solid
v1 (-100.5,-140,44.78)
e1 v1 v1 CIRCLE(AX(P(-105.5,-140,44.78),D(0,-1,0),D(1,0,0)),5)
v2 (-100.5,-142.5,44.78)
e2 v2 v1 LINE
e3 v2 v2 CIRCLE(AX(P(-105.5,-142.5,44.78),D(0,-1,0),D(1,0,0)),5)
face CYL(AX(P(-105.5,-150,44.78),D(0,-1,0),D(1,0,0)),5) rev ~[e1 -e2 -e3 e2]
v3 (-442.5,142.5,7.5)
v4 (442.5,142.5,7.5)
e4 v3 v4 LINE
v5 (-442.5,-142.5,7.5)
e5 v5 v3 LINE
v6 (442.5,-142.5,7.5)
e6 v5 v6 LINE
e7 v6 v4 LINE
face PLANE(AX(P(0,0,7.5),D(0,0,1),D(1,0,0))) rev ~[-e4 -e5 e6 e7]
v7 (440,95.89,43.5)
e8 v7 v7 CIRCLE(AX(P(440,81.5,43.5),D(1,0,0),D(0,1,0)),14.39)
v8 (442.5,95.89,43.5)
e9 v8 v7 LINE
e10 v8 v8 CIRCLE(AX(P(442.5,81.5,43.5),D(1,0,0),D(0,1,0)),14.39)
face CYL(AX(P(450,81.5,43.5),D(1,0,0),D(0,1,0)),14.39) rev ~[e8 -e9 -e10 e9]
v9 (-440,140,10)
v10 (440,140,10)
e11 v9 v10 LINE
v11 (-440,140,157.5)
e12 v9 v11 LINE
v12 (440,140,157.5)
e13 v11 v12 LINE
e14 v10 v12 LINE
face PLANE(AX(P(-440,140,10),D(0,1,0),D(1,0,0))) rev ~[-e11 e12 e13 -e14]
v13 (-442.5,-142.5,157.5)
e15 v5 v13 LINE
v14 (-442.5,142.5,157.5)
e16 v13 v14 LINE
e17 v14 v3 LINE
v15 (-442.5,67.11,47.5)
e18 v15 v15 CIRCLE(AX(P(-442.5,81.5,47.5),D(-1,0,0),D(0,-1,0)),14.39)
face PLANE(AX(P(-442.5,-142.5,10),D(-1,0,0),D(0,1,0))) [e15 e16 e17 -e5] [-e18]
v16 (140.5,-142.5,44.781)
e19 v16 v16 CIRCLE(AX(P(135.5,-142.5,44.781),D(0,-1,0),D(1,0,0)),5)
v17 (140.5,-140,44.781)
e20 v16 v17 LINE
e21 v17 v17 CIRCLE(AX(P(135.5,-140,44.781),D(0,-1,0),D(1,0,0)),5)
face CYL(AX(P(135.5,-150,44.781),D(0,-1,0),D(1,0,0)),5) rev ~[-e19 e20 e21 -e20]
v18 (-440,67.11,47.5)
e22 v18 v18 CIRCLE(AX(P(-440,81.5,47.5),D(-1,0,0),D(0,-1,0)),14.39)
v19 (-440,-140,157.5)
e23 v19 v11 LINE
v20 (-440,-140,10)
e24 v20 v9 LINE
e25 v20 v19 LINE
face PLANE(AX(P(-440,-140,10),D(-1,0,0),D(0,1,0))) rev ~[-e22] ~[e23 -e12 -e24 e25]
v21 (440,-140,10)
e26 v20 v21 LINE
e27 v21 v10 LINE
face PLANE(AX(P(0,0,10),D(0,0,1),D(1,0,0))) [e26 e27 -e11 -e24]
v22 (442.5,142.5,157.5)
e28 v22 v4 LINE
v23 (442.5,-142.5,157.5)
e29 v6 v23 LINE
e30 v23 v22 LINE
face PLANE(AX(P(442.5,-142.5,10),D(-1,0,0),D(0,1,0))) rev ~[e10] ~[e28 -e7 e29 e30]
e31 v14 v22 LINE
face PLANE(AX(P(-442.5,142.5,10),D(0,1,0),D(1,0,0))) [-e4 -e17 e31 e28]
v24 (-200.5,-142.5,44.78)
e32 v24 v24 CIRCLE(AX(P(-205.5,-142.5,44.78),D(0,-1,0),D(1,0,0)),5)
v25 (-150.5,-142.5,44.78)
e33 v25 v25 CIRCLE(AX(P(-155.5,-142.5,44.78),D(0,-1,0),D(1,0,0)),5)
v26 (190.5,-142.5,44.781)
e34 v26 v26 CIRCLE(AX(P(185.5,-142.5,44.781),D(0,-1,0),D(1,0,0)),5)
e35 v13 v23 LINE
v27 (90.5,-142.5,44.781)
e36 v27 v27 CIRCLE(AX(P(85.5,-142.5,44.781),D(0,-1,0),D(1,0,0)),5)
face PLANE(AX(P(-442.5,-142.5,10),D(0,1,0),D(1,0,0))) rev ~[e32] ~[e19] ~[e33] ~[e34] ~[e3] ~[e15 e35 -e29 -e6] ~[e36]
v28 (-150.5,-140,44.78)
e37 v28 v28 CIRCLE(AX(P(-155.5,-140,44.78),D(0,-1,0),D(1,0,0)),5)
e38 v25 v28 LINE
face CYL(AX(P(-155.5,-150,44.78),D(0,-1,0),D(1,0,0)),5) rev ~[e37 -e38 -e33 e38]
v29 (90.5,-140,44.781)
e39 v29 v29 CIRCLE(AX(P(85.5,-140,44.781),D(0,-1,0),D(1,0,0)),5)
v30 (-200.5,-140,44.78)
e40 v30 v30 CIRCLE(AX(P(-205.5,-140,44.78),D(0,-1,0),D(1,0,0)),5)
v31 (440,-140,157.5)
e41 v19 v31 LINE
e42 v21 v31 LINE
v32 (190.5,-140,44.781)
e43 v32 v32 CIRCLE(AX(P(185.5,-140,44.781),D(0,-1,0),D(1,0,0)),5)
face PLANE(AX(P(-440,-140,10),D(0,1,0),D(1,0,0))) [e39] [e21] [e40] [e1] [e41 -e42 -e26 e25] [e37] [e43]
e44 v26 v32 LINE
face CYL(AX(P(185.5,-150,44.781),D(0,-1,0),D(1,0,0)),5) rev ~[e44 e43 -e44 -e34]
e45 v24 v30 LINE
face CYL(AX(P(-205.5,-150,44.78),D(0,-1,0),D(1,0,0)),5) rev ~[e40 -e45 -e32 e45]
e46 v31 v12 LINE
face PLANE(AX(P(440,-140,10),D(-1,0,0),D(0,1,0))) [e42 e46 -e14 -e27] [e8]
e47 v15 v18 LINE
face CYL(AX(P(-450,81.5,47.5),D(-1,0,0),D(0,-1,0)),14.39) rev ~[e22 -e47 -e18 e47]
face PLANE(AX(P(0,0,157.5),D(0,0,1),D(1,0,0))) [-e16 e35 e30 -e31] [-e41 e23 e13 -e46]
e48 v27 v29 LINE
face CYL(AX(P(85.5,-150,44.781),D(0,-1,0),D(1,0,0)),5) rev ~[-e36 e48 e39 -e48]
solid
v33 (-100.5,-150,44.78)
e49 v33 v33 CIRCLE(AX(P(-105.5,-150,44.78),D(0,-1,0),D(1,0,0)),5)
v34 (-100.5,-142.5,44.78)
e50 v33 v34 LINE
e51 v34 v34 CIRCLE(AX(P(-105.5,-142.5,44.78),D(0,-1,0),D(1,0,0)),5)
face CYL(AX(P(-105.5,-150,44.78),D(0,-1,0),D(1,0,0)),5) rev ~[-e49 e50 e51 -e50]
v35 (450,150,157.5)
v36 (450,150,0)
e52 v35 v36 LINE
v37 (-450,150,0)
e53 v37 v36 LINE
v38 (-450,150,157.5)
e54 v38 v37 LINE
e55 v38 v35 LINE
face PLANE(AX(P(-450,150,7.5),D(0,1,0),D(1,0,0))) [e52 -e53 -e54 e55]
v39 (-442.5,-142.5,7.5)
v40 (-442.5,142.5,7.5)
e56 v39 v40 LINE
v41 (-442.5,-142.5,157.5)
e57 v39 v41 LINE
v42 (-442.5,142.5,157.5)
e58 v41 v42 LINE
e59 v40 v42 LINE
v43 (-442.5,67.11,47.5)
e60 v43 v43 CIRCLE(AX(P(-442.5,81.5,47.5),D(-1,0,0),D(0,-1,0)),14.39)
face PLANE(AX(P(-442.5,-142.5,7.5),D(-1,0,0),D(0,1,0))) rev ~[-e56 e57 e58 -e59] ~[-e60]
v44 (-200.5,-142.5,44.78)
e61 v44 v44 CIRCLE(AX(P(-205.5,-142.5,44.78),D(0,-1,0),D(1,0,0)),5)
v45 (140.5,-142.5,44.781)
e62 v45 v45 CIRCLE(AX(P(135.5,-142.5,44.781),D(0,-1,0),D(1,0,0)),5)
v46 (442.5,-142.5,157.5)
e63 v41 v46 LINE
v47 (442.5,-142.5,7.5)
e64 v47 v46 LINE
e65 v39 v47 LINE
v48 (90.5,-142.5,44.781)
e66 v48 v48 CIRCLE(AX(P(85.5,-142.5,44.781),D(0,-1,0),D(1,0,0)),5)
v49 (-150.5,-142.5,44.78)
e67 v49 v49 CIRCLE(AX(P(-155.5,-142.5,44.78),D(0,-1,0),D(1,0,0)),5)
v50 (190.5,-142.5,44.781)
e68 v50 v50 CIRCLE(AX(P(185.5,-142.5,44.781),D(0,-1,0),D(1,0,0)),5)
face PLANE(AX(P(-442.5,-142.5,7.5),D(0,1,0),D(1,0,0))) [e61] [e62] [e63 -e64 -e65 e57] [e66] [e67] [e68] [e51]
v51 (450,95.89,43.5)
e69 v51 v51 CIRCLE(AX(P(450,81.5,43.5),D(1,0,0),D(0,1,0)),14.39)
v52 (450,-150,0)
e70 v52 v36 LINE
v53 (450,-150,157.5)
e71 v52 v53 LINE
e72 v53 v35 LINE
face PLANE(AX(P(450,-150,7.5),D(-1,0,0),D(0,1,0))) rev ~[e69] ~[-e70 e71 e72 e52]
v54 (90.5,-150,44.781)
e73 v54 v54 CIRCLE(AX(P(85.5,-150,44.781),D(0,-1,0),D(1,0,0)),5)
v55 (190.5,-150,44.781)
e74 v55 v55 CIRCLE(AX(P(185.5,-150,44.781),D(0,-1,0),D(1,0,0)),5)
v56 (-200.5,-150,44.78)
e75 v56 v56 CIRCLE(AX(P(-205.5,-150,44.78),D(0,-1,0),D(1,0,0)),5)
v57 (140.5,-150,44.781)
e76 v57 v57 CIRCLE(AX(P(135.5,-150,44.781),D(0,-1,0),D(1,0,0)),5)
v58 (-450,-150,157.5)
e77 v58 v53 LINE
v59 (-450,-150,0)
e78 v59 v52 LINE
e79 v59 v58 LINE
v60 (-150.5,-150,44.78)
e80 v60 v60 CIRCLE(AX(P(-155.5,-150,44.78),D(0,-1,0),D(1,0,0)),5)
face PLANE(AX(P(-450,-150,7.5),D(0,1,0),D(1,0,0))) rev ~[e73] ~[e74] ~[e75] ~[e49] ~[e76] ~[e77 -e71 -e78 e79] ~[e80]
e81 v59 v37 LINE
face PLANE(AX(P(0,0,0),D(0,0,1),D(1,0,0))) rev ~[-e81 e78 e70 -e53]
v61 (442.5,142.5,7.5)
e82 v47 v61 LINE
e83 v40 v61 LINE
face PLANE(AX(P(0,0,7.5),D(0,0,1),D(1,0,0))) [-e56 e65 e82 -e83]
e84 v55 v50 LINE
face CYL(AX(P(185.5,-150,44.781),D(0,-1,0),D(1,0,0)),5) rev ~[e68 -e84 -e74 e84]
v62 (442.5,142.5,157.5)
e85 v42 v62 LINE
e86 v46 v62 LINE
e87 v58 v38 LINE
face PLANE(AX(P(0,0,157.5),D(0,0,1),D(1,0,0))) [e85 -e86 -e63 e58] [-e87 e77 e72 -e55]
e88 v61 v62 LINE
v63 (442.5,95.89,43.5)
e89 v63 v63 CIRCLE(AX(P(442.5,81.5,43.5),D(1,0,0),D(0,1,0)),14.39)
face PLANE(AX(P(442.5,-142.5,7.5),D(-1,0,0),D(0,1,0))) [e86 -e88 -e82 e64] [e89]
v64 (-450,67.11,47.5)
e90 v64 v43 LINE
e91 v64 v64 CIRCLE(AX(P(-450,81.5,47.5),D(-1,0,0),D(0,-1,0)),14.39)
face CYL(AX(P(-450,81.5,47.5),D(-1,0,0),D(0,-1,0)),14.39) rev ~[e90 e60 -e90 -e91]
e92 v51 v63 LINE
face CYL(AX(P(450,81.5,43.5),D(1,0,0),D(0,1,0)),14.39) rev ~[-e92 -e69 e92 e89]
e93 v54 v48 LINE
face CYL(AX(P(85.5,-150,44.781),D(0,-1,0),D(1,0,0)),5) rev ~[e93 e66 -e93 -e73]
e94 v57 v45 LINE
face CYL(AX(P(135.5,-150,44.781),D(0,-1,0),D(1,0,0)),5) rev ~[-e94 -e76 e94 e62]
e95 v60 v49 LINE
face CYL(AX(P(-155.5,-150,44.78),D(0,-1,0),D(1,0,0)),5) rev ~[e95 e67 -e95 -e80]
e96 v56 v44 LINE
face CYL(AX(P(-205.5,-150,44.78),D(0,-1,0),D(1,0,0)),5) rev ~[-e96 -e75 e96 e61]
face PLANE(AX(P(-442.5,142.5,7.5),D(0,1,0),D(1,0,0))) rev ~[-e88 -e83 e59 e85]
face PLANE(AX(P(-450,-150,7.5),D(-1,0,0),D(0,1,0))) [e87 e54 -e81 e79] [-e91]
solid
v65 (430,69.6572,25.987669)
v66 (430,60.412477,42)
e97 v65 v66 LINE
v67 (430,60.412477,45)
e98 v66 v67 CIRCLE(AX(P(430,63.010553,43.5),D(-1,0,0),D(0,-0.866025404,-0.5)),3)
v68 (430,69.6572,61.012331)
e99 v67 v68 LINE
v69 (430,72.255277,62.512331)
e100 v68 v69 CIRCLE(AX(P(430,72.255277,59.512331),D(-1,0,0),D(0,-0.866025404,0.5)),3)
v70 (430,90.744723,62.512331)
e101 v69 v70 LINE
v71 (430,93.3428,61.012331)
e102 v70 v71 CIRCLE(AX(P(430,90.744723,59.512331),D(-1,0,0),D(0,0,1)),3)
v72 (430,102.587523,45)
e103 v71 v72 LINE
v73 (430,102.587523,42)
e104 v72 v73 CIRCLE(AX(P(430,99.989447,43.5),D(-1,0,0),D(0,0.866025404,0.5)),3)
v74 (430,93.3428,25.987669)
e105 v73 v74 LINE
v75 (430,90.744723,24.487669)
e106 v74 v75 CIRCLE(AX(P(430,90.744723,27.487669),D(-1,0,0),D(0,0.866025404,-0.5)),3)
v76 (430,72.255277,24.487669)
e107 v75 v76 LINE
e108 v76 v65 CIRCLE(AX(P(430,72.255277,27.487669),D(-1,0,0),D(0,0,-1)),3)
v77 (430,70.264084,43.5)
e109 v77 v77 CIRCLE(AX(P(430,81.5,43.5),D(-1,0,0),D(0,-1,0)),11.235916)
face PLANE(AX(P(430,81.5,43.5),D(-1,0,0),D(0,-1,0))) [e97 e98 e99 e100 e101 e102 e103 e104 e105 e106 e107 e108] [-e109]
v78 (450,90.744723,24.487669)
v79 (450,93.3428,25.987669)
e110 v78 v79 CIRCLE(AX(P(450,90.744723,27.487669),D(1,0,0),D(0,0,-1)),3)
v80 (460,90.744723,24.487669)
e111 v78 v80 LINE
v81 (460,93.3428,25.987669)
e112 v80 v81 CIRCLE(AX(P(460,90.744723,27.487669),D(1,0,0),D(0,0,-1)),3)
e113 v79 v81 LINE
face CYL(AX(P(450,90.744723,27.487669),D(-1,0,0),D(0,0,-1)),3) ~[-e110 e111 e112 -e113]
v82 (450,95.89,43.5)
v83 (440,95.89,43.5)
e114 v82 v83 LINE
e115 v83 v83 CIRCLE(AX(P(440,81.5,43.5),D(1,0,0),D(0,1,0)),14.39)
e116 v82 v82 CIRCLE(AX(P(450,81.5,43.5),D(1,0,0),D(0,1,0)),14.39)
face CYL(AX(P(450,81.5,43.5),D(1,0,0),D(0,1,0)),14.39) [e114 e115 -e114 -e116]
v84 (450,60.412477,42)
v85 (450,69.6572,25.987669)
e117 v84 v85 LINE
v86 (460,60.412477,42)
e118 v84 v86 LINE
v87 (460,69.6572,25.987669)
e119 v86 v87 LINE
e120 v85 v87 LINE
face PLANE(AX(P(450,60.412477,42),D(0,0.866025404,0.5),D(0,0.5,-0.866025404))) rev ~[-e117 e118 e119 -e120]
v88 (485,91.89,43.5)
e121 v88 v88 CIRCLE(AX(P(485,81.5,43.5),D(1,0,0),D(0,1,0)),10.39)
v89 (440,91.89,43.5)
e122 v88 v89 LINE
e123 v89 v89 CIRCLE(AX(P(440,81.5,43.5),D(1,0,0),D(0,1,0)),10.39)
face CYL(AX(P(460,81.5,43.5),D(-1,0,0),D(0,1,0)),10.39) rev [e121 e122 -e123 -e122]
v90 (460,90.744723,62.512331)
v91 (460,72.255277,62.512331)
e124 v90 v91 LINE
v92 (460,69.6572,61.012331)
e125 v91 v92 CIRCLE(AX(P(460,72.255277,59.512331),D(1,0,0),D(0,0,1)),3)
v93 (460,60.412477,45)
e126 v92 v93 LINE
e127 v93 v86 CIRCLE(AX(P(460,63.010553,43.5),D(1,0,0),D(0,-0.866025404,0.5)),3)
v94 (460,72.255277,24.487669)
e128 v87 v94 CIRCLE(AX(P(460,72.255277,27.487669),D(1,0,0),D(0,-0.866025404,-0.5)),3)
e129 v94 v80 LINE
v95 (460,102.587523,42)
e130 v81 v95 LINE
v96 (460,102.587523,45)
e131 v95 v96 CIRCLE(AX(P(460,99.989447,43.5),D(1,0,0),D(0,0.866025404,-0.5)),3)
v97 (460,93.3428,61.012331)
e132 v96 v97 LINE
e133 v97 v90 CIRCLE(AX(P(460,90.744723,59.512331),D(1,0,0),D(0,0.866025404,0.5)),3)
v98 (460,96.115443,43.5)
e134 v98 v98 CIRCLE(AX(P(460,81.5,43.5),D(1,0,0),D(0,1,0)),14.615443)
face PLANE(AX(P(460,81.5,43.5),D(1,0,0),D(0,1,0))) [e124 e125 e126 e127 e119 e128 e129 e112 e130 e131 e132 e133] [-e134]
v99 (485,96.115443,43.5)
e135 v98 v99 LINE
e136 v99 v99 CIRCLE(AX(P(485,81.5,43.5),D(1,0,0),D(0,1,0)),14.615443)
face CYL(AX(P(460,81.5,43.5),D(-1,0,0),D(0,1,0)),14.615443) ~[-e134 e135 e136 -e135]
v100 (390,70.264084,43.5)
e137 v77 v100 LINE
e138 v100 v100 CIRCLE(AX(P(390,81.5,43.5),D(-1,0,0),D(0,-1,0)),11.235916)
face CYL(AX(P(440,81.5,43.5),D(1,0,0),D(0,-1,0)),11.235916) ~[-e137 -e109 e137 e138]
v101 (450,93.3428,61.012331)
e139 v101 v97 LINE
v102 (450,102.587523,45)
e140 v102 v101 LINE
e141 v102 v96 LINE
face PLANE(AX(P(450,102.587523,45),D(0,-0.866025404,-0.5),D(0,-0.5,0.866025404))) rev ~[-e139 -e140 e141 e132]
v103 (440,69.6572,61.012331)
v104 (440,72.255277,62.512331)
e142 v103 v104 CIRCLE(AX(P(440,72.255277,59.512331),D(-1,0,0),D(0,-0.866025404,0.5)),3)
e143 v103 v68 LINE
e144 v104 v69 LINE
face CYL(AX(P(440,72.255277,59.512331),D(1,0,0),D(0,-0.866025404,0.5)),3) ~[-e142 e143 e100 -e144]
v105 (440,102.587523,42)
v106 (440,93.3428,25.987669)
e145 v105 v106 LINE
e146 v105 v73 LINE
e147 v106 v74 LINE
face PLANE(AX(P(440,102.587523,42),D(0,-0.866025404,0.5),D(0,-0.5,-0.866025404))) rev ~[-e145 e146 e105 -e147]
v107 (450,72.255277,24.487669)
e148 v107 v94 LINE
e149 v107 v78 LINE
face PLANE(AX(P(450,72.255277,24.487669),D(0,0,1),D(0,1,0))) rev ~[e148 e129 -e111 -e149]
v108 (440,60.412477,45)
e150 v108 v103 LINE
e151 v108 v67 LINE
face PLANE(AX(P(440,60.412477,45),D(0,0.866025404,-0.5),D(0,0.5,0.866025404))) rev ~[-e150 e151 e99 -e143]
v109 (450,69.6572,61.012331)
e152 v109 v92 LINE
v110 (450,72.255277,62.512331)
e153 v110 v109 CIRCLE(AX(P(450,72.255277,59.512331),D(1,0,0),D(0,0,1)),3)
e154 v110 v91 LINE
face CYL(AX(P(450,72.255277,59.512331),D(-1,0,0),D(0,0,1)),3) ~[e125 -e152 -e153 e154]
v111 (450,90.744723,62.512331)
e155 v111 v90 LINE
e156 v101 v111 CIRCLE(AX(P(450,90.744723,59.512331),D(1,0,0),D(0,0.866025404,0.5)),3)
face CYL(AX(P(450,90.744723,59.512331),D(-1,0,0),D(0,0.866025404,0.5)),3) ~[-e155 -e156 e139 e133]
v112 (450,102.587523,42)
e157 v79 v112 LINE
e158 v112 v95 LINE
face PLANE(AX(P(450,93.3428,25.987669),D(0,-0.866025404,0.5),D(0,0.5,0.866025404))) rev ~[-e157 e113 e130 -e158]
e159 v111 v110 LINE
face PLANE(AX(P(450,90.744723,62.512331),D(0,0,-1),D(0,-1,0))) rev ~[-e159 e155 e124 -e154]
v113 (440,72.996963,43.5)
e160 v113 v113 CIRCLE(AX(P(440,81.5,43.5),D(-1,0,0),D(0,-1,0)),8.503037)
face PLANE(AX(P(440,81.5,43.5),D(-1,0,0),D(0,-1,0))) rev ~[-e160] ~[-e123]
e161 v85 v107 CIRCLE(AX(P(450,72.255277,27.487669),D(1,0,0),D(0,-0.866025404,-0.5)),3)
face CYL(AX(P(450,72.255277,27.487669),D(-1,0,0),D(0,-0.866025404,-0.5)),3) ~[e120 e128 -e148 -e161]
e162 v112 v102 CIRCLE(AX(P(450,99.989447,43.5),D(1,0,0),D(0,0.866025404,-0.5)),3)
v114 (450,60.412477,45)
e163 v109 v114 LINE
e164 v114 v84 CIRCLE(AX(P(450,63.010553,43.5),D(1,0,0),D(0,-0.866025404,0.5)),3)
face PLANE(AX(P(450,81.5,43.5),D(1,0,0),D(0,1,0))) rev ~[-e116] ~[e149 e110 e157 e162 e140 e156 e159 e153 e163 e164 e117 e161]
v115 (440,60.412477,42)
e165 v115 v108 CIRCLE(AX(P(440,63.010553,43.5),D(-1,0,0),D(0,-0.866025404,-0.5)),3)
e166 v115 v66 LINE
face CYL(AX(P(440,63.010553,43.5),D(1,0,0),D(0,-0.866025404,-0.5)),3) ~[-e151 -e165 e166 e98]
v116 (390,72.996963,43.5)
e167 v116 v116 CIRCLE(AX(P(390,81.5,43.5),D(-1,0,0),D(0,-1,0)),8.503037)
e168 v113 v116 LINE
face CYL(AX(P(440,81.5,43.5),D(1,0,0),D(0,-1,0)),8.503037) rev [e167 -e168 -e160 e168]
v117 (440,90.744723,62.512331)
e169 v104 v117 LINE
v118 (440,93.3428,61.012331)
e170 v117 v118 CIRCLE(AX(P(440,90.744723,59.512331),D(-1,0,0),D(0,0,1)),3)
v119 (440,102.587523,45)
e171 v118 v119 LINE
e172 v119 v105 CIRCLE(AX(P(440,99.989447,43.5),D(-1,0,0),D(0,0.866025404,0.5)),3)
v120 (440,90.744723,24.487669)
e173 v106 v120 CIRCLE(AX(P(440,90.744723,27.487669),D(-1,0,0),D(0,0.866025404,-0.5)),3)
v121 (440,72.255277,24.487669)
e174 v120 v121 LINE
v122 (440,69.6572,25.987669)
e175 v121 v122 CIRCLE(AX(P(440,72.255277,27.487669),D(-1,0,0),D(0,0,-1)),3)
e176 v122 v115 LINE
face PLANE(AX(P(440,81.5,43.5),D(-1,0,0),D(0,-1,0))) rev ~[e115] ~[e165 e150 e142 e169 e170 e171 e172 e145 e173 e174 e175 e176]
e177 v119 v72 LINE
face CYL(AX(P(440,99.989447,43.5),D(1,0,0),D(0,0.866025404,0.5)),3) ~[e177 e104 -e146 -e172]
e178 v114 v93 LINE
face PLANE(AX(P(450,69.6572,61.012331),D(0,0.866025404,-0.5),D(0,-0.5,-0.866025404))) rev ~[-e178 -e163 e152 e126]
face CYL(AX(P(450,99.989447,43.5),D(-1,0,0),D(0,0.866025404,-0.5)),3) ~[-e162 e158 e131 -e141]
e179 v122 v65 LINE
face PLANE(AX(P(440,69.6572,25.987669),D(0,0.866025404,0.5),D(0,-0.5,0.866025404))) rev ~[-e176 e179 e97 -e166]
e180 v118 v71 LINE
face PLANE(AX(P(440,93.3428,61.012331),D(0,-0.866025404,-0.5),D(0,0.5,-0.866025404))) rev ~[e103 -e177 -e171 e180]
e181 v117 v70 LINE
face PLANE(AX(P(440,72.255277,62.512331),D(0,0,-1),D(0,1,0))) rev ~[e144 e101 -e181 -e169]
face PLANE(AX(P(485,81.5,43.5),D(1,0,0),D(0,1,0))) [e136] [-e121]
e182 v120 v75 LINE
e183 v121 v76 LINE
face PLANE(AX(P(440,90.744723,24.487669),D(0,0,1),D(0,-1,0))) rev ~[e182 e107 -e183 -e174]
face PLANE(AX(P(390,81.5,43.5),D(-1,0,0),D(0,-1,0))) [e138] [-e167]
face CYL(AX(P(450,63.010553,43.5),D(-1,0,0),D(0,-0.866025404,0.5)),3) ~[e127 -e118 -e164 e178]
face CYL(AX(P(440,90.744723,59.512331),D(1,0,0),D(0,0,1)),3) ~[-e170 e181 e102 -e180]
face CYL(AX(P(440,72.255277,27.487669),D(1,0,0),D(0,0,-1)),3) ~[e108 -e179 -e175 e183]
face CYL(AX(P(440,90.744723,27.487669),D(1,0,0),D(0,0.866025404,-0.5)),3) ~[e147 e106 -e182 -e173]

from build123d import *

# Parameters (mm, degrees)
F0_W      = 900
F0_H      = 300
F1_DEPTH  = 7.5
F2_W      = 900
F2_H      = 300
F2_W_2    = 885
F2_H_2    = 285
F3_DEPTH  = 150
F4_DEPTH  = 2.5
F5_W      = 885
F5_H      = 285
F5_W_2    = 880
F5_H_2    = 280
F6_DEPTH  = 147.5
F7_R      = 5
F8_DEPTH  = 25
F9_R      = 14.39
F10_DEPTH = 500
F11_R     = 14.39
F12_DEPTH = 25
F13_R     = 14.39
F13_R_2   = 10.39
F14_DEPTH = 10
F15_R     = 10.39
F16_DEPTH = 10
F17_R     = 14.6154428136
F17_R_2   = 10.39
F18_DEPTH = 25
F19_R     = 11.2359155228
F19_R_2   = 8.5030368104
F20_DEPTH = 50
F21_R     = 11.2359155228
F22_DEPTH = 10


with BuildPart() as f1:
    # F0 (on Top) → F1 (new body)
    with BuildSketch(Plane.XY):
        Rectangle(F0_W, F0_H)
    extrude(amount=F1_DEPTH)

    # F2 (on face) → F3 (join)
    with BuildSketch(Plane.XY.offset(7.5)):
        Rectangle(F2_W, F2_H)
        Rectangle(F2_W_2, F2_H_2, mode=Mode.SUBTRACT)
    extrude(amount=F3_DEPTH)


with BuildPart() as f4:
    # F4 (new): a face of the model
    f4_faces = [f1.part.faces().sort_by_distance(p)[0] for p in [
        (0, 0, 7.5),
    ]]
    extrude(f4_faces, amount=F4_DEPTH)

    # F5 (on face) → F6 (join)
    with BuildSketch(Plane.XY.offset(10)):
        Rectangle(F5_W, F5_H)
        Rectangle(F5_W_2, F5_H_2, mode=Mode.SUBTRACT)
    extrude(amount=F6_DEPTH)


with BuildPart() as f8_tool:
    # F7 (on face) → F8 (new body)
    with BuildSketch(Plane.XZ.offset(150)):
        with Locations((85.5, 44.781)):
            Circle(F7_R)
        with Locations((135.5, 44.781)):
            Circle(F7_R)
        with Locations((-105.5, 44.78)):
            Circle(F7_R)
        with Locations((-155.5, 44.78)):
            Circle(F7_R)
        with Locations((185.5, 44.781)):
            Circle(F7_R)
        with Locations((-205.5, 44.78)):
            Circle(F7_R)
    extrude(amount=-F8_DEPTH)


with BuildPart() as f1_1:
    add(f1.part)

    # F8: cut by f8_tool
    add(f8_tool.part, mode=Mode.SUBTRACT)


with BuildPart() as f4_1:
    add(f4.part)

    # F8: cut by f8_tool
    add(f8_tool.part, mode=Mode.SUBTRACT)


with BuildPart() as f10_tool:
    # F9 (on face) → F10 (new body)
    with BuildSketch(Plane(origin=(-450, 0, 0), x_dir=(0, -1, 0), z_dir=(-1, 0, 0))):
        with Locations((-81.5, 47.5)):
            Circle(F9_R)
    extrude(amount=-F10_DEPTH)


with BuildPart() as f1_2:
    add(f1_1.part)

    # F10: cut by f10_tool
    add(f10_tool.part, mode=Mode.SUBTRACT)


with BuildPart() as f4_2:
    add(f4_1.part)

    # F10: cut by f10_tool
    add(f10_tool.part, mode=Mode.SUBTRACT)


with BuildPart() as f12_tool:
    # F11 (on face) → F12 (new body)
    with BuildSketch(Plane.YZ.offset(450)):
        with Locations((81.5, 43.5)):
            Circle(F11_R)
    extrude(amount=-F12_DEPTH)


with BuildPart() as f1_3:
    add(f1_2.part)

    # F12: cut by f12_tool
    add(f12_tool.part, mode=Mode.SUBTRACT)


with BuildPart() as f4_3:
    add(f4_2.part)

    # F12: cut by f12_tool
    add(f12_tool.part, mode=Mode.SUBTRACT)


with BuildPart() as f14:
    # F13 (on face) → F14 (new body)
    with BuildSketch(Plane.YZ.offset(450)):
        with Locations((81.5, 43.5)):
            Circle(F13_R)
        with Locations((81.5, 43.5)):
            Circle(F13_R_2, mode=Mode.SUBTRACT)
    extrude(amount=-F14_DEPTH)

    # F15 (on face) → F16 (join)
    with BuildSketch(Plane.YZ.offset(450)):
        with BuildLine():
            Line((90.7447234463, 62.5123307109), (72.2552765537, 62.5123307109))
            ThreePointArc((72.2552765537, 62.5123307109), (70.7552765537, 62.1104069222), (69.6572003424, 61.0123307109))
            Line((69.6572003424, 61.0123307109), (60.4124768961, 45))
            ThreePointArc((60.4124768961, 45), (60.0105531074, 43.5), (60.4124768961, 42))
            Line((60.4124768961, 42), (69.6572003424, 25.9876692891))
            ThreePointArc((69.6572003424, 25.9876692891), (70.7552765537, 24.8895930778), (72.2552765537, 24.4876692891))
            Line((72.2552765537, 24.4876692891), (90.7447234463, 24.4876692891))
            ThreePointArc((90.7447234463, 24.4876692891), (92.2447234463, 24.8895930778), (93.3427996576, 25.9876692891))
            Line((93.3427996576, 25.9876692891), (102.5875231039, 42))
            ThreePointArc((102.5875231039, 42), (102.9894468926, 43.5), (102.5875231039, 45))
            Line((102.5875231039, 45), (93.3427996576, 61.0123307109))
            ThreePointArc((93.3427996576, 61.0123307109), (92.2447234463, 62.1104069222), (90.7447234463, 62.5123307109))
        make_face()
        with Locations((81.5, 43.5)):
            Circle(F15_R, mode=Mode.SUBTRACT)
    extrude(amount=F16_DEPTH)

    # F17 (on face) → F18 (join)
    with BuildSketch(Plane.YZ.offset(460)):
        with Locations((81.5, 43.5)):
            Circle(F17_R)
        with Locations((81.5, 43.5)):
            Circle(F17_R_2, mode=Mode.SUBTRACT)
    extrude(amount=F18_DEPTH)

    # F19 (on face) → F20 (join)
    with BuildSketch(Plane(origin=(440, 0, 0), x_dir=(0, -1, 0), z_dir=(-1, 0, 0))):
        with Locations((-81.5, 43.5)):
            Circle(F19_R)
        with Locations((-81.5, 43.5)):
            Circle(F19_R_2, mode=Mode.SUBTRACT)
    extrude(amount=F20_DEPTH)

    # F21 (on face) → F22 (join)
    with BuildSketch(Plane(origin=(440, 0, 0), x_dir=(0, -1, 0), z_dir=(-1, 0, 0))):
        with BuildLine():
            Line((-72.2552765537, 62.5123307109), (-90.7447234463, 62.5123307109))
            ThreePointArc((-90.7447234463, 62.5123307109), (-92.2447234463, 62.1104069222), (-93.3427996576, 61.0123307109))
            Line((-93.3427996576, 61.0123307109), (-102.5875231039, 45))
            ThreePointArc((-102.5875231039, 45), (-102.9894468926, 43.5), (-102.5875231039, 42))
            Line((-102.5875231039, 42), (-93.3427996576, 25.9876692891))
            ThreePointArc((-93.3427996576, 25.9876692891), (-92.2447234463, 24.8895930778), (-90.7447234463, 24.4876692891))
            Line((-90.7447234463, 24.4876692891), (-72.2552765537, 24.4876692891))
            ThreePointArc((-72.2552765537, 24.4876692891), (-70.7552765537, 24.8895930778), (-69.6572003424, 25.9876692891))
            Line((-69.6572003424, 25.9876692891), (-60.4124768961, 42))
            ThreePointArc((-60.4124768961, 42), (-60.0105531074, 43.5), (-60.4124768961, 45))
            Line((-60.4124768961, 45), (-69.6572003424, 61.0123307109))
            ThreePointArc((-69.6572003424, 61.0123307109), (-70.7552765537, 62.1104069222), (-72.2552765537, 62.5123307109))
        make_face()
        with Locations((-81.5, 43.5)):
            Circle(F21_R, mode=Mode.SUBTRACT)
    extrude(amount=F22_DEPTH)


solid = Compound([f1_3.part, f4_3.part, f14.part])
